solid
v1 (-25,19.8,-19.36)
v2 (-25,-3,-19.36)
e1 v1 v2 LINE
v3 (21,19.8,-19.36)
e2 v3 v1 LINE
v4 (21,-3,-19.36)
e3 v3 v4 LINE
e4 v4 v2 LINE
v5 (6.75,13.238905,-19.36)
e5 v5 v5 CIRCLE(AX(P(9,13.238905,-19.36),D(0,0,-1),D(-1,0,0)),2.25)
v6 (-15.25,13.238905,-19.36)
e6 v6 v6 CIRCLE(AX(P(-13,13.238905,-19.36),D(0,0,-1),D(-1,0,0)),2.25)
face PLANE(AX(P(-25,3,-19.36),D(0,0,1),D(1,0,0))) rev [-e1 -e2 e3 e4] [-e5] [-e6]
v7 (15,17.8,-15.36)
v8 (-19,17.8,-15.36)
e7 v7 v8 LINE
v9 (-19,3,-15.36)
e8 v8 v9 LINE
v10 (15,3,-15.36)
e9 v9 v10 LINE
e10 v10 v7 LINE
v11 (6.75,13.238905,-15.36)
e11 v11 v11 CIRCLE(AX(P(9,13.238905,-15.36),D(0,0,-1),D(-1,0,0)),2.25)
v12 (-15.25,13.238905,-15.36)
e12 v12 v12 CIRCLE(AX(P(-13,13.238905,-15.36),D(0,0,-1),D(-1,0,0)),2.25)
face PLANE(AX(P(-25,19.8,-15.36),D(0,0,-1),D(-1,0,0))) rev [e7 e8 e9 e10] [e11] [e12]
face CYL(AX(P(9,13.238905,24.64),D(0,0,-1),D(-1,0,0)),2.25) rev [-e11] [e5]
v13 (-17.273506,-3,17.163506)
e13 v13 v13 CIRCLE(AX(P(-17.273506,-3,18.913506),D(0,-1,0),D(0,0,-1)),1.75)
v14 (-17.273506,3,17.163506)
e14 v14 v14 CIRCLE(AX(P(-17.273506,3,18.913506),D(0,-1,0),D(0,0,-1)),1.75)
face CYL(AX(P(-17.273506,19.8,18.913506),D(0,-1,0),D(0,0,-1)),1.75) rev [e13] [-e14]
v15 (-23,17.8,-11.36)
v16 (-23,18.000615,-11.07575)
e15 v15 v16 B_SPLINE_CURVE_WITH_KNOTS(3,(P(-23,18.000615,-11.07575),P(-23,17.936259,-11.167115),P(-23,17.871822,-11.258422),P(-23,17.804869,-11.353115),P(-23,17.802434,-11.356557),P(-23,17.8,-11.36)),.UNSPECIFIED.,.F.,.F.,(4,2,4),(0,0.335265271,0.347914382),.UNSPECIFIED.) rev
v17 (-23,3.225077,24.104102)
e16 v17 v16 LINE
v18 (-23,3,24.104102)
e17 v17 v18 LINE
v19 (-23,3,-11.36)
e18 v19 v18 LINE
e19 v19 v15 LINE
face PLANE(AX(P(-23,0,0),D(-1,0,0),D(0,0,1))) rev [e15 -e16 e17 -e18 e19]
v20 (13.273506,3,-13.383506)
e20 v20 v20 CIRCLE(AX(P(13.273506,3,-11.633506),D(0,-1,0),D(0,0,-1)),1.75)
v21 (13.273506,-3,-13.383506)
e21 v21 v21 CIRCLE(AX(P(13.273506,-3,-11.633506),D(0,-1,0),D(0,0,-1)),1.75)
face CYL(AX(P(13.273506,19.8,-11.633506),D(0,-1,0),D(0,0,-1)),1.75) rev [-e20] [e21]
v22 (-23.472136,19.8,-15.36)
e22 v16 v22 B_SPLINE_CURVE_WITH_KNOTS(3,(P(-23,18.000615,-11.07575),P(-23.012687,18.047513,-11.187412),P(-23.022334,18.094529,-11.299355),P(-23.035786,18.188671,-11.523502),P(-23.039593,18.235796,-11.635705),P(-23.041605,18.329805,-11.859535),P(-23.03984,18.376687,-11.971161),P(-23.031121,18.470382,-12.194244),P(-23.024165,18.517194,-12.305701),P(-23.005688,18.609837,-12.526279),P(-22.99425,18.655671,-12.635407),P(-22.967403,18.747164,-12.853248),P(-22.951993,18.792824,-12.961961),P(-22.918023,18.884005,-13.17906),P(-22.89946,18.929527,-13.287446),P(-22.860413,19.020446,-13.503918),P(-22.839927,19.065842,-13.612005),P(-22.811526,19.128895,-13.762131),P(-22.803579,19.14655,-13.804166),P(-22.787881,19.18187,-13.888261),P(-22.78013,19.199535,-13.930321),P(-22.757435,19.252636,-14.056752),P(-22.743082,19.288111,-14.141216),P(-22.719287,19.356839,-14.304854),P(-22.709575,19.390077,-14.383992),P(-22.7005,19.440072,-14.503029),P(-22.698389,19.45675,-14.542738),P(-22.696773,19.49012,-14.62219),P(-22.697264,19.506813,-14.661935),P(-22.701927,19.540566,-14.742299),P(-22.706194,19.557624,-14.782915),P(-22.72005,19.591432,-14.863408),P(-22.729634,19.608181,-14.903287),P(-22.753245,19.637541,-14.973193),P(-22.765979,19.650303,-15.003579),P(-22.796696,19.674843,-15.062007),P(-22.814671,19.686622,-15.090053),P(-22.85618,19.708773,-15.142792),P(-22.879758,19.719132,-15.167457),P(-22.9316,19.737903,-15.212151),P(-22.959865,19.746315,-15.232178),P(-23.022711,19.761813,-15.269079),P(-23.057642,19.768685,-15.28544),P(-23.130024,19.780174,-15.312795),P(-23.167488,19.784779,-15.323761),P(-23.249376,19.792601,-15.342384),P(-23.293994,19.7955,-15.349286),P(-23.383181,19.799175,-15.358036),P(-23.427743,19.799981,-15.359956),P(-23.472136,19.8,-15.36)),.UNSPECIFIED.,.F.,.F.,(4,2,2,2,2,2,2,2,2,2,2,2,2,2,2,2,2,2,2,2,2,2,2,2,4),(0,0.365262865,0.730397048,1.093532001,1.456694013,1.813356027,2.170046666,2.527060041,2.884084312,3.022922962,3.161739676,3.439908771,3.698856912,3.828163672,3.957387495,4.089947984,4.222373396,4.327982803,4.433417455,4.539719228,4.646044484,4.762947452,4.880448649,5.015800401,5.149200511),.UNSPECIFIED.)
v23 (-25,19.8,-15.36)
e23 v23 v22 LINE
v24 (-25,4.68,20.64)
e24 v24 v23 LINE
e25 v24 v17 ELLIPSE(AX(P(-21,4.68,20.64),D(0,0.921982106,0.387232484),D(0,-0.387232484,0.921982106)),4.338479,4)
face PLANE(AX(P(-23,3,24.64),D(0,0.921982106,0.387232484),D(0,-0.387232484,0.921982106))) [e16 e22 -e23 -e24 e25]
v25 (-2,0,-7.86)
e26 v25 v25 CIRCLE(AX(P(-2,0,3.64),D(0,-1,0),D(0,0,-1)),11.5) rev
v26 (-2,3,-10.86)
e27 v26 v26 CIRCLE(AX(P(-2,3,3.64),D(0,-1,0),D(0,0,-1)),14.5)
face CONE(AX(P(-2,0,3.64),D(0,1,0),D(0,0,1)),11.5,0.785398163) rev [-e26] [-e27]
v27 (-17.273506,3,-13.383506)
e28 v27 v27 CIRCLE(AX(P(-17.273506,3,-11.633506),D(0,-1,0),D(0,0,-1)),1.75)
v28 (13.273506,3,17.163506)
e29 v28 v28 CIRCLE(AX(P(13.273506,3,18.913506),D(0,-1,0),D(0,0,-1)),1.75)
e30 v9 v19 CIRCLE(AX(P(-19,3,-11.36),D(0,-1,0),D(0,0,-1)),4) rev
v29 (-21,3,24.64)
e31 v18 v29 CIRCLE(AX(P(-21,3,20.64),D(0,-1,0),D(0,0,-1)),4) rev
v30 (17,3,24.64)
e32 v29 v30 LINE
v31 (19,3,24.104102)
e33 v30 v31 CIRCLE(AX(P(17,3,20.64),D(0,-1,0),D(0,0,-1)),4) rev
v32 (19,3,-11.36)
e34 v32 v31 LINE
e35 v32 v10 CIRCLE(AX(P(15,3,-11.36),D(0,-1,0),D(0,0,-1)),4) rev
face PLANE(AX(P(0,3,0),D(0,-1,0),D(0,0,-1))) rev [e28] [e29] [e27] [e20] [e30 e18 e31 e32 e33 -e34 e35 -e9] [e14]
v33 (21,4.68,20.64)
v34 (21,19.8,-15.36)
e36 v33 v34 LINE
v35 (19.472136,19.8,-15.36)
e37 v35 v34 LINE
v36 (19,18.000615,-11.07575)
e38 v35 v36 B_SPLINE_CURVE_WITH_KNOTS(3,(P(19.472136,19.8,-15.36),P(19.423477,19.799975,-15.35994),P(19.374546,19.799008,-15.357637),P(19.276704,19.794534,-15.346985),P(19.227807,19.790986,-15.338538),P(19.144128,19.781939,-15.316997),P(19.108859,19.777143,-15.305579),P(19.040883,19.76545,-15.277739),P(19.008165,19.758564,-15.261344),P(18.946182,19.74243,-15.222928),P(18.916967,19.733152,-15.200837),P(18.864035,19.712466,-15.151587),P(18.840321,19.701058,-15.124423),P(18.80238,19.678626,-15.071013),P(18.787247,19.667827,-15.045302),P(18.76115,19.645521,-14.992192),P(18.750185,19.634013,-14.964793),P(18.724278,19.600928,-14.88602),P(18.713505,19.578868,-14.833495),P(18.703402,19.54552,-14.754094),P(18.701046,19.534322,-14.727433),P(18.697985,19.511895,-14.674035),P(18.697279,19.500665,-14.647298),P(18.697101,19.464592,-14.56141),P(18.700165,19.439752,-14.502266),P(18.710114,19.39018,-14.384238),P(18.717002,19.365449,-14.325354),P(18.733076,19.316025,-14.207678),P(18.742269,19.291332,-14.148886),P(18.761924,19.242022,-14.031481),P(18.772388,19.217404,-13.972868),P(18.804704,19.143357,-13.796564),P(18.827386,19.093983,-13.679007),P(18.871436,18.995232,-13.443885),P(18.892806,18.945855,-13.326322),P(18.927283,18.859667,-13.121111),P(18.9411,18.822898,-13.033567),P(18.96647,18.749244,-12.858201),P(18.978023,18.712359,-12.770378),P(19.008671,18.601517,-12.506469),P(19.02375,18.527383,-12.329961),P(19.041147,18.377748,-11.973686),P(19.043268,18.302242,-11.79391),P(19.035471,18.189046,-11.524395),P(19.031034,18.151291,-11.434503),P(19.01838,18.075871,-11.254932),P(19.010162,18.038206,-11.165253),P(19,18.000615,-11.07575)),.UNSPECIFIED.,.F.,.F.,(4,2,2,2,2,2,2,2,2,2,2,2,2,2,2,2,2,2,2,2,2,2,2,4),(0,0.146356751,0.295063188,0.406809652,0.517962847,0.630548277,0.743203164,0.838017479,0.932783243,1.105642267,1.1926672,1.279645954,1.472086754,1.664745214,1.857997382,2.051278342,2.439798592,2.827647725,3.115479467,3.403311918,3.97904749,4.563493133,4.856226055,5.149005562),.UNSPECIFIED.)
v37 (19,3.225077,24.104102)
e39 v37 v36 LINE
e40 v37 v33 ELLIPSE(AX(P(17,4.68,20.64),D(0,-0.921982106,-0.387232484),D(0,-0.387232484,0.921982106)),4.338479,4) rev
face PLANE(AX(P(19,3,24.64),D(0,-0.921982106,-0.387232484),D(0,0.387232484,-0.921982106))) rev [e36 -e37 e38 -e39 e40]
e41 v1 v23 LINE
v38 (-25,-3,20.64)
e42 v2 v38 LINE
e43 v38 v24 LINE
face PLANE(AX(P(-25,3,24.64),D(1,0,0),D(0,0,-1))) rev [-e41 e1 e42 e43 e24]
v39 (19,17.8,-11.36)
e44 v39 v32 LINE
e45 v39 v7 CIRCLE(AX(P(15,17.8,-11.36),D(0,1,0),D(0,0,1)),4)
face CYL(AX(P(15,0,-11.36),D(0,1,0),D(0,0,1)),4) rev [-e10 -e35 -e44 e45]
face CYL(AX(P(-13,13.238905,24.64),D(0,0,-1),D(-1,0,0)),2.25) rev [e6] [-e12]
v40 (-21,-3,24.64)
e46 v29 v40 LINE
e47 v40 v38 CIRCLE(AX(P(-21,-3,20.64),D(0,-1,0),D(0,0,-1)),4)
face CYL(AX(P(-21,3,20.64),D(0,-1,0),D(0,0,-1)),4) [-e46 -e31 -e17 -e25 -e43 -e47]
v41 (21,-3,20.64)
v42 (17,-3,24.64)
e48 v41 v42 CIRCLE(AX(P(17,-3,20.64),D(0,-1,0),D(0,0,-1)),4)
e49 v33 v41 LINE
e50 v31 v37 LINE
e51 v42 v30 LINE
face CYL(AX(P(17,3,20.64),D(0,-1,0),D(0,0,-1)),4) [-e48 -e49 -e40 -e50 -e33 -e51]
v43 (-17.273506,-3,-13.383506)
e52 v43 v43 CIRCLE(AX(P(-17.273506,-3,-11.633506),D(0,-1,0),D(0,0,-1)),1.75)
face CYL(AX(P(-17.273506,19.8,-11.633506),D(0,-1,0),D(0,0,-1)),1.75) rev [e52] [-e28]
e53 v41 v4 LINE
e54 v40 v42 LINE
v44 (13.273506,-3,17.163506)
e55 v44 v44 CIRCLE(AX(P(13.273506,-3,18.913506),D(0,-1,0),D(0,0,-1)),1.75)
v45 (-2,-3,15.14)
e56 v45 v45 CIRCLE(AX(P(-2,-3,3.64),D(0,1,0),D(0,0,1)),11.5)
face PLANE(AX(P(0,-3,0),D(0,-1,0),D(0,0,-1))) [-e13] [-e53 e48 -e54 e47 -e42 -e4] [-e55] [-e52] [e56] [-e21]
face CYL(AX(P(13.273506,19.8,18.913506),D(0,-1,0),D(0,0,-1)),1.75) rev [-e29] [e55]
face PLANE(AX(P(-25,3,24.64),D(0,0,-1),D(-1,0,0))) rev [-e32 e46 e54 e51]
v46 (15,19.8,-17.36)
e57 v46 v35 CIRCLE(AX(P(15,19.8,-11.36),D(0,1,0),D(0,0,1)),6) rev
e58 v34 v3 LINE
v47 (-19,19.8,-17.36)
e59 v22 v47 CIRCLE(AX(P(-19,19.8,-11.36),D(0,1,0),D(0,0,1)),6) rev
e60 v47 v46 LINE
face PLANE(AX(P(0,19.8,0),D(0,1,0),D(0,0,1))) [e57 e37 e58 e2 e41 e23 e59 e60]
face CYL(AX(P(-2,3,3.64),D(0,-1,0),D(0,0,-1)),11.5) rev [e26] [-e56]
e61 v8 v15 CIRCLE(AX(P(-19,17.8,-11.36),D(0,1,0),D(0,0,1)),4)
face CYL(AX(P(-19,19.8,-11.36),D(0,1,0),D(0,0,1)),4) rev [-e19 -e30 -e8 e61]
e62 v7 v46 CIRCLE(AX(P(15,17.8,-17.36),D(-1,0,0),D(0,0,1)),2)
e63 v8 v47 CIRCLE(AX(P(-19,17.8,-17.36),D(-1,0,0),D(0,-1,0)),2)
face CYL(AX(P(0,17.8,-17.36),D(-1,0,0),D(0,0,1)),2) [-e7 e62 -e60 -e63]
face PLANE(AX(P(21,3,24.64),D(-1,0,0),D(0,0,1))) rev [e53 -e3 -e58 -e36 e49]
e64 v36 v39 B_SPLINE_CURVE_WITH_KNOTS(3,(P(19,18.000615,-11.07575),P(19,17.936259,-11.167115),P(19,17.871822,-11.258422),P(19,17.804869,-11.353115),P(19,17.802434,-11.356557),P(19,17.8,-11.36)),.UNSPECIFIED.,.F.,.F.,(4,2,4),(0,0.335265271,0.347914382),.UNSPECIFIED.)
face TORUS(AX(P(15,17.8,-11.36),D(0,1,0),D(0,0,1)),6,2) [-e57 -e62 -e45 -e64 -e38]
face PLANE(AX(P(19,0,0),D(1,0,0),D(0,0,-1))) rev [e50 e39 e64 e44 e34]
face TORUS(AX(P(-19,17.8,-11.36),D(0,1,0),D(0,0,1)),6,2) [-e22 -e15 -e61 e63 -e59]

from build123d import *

# Parameters (mm, degrees)
BOSS_EXTRUDE1_START = -3
SKETCH1_W           = 46
SKETCH1_H           = 44
SKETCH1_R           = 11.5
BOSS_EXTRUDE1_DEPTH = 6
SKETCH3_W           = 46
SKETCH3_H           = 4
BOSS_EXTRUDE2_DEPTH = 16.8
BOSS_EXTRUDE3_DEPTH = 2
BOSS_EXTRUDE4_START = -46
BOSS_EXTRUDE4_DEPTH = 2
SKETCH5_R           = 1.75
CUT_EXTRUDE1_DEPTH  = 42.856535929
SKETCH6_R           = 2.25
CUT_EXTRUDE2_DEPTH  = 55.341880718
FILLET1_R           = 4
FILLET2_START       = -19.0000001
FILLET2_2_DEPTH     = 34.0000001
CHAMFER1_SIZE       = 3


with BuildPart() as part:
    # Sketch1 → Boss-Extrude1 (new body)
    with BuildSketch(Plane(origin=(0, 0, 0), x_dir=(1, 0, 0), z_dir=(0, 1, 0)).offset(BOSS_EXTRUDE1_START)):
        with Locations((-2, -2.64)):
            Rectangle(SKETCH1_W, SKETCH1_H)
        with Locations(Location((-2, -3.64, 0), (0, 0, 270))):
            Circle(SKETCH1_R, mode=Mode.SUBTRACT)
    extrude(amount=BOSS_EXTRUDE1_DEPTH)

    # Sketch3 → Boss-Extrude2 (add)
    with BuildSketch(Plane(origin=(0, 3, 0), x_dir=(1, 0, 0), z_dir=(0, 1, 0))):
        with Locations((-2, 17.36)):
            Rectangle(SKETCH3_W, SKETCH3_H)
    extrude(amount=BOSS_EXTRUDE2_DEPTH)

    # Sketch4 → Boss-Extrude3 (add)
    with BuildSketch(Plane.ZY.offset(25)):
        Polygon((-15.36, 19.8), (-15.36, 3), (24.64, 3), align=None)
    extrude(amount=-BOSS_EXTRUDE3_DEPTH)

    # Sketch4<2> → Boss-Extrude4 (add)
    with BuildSketch(Plane.ZY.offset(25).offset(BOSS_EXTRUDE4_START)):
        Polygon((-15.36, 19.8), (-15.36, 3), (24.64, 3), align=None)
    extrude(amount=BOSS_EXTRUDE4_DEPTH)

    # Sketch5 → Cut-Extrude1 (cut, through all)
    with BuildSketch(Plane.XZ.offset(3)):
        with Locations(Location((-17.273506474, 18.913506474, 0), (0, 0, 270))):
            Circle(SKETCH5_R)
        with Locations(Location((13.273506474, 18.913506474, 0), (0, 0, 270))):
            Circle(SKETCH5_R)
        with Locations(Location((13.273506474, -11.633506474, 0), (0, 0, 270))):
            Circle(SKETCH5_R)
        with Locations(Location((-17.273506474, -11.633506474, 0), (0, 0, 270))):
            Circle(SKETCH5_R)
    extrude(amount=-CUT_EXTRUDE1_DEPTH, mode=Mode.SUBTRACT)

    # Sketch6 → Cut-Extrude2 (cut, through all)
    with BuildSketch(Plane(origin=(0, 0, -19.36), x_dir=(-1, 0, 0), z_dir=(0, 0, -1))):
        with Locations((-9, 13.23890477)):
            Circle(SKETCH6_R)
        with Locations((13, 13.23890477)):
            Circle(SKETCH6_R)
    extrude(amount=-CUT_EXTRUDE2_DEPTH, mode=Mode.SUBTRACT)

    # Fillet1
    # the kernel refuses this fillet: 4 mm, written as the material it adds along each edge
    with BuildSketch(Plane(origin=(-23, 29.8, -15.36), x_dir=(0, 0, 1), z_dir=(0, -1, 0))) as fillet1_piece_1_section:
        with BuildLine():
            CenterArc((FILLET1_R, -FILLET1_R), FILLET1_R, 90, 90)
            Line((0, -FILLET1_R), (0, 0))
            Line((0, 0), (FILLET1_R, 0))
        make_face()
    fillet1_piece_1 = extrude(amount=26.8, mode=Mode.PRIVATE)
    fillet1_piece_1 = split(fillet1_piece_1, bisect_by=Plane(origin=(-23, 21.299489969, -18.930214213), z_dir=(0, -0.9219821056073614, -0.3872324843550918)), keep=Keep.TOP, mode=Mode.PRIVATE)
    add(fillet1_piece_1)
    with BuildSketch(Plane(origin=(19, 29.8, -15.36), x_dir=(0, 0, 1), z_dir=(0, -1, 0))) as fillet1_piece_2_section:
        with BuildLine():
            CenterArc((FILLET1_R, FILLET1_R), FILLET1_R, 180, 90)
            Line((0, FILLET1_R), (0, 0))
            Line((0, 0), (FILLET1_R, 0))
        make_face()
    fillet1_piece_2 = extrude(amount=26.8, mode=Mode.PRIVATE)
    fillet1_piece_2 = split(fillet1_piece_2, bisect_by=Plane(origin=(19, 21.299489969, -18.930214213), z_dir=(0, -0.9219821056073614, -0.3872324843550918)), keep=Keep.TOP, mode=Mode.PRIVATE)
    add(fillet1_piece_2)
    # the kernel refuses this fillet: 4 mm, written as the material it takes off along each edge
    with BuildSketch(Plane(origin=(21, -13, 24.64), x_dir=(-1, 0, 0), z_dir=(0, 1, 0))) as fillet1_2_piece_1:
        with BuildLine():
            CenterArc((FILLET1_R, -FILLET1_R), FILLET1_R, 90, 90)
            Line((0, -FILLET1_R), (0, 0))
            Line((0, 0), (FILLET1_R, 0))
        make_face()
    extrude(amount=26, mode=Mode.SUBTRACT)
    with BuildSketch(Plane(origin=(-25, -13, 24.64), x_dir=(1, 0, 0), z_dir=(0, 1, 0))) as fillet1_2_piece_2:
        with BuildLine():
            CenterArc((FILLET1_R, FILLET1_R), FILLET1_R, 180, 90)
            Line((0, FILLET1_R), (0, 0))
            Line((0, 0), (FILLET1_R, 0))
        make_face()
    extrude(amount=26, mode=Mode.SUBTRACT)

    # Fillet2: read off the stored shape, not the designer's step
    # Fillet2 outline → Fillet2 (revolve, cut)
    with BuildSketch(Plane(origin=(15, 0, -11.36), x_dir=(1, 0, 0), z_dir=(0, 0, 1))):
        with BuildLine():
            ThreePointArc((4, 17.8), (4.585786438, 19.214213562), (6, 19.8))
            Line((6, 19.8), (4, 19.8))
            Line((4, 19.8), (4, 17.8))
        make_face()
    revolve(axis=Axis((15, 0, -11.36), (0, 1, 0)), mode=Mode.SUBTRACT)

    # Fillet2 2 outline → Fillet2 2 (cut)
    with BuildSketch(Plane.YZ.offset(FILLET2_START)):
        with BuildLine():
            Line((19.8, -15.36), (17.8, -15.36))
            ThreePointArc((17.8, -15.36), (19.214213562, -15.945786438), (19.8, -17.36))
            Line((19.8, -17.36), (19.8, -15.36))
        make_face()
    extrude(amount=FILLET2_2_DEPTH, mode=Mode.SUBTRACT)

    # Fillet2 3 outline → Fillet2 3 (revolve, cut)
    with BuildSketch(Plane(origin=(-19, 0, -11.36), x_dir=(1, 0, 0), z_dir=(0, 0, 1))):
        with BuildLine():
            ThreePointArc((4, 17.8), (4.585786438, 19.214213562), (6, 19.8))
            Line((6, 19.8), (4, 19.8))
            Line((4, 19.8), (4, 17.8))
        make_face()
    revolve(axis=Axis((-19, 0, -11.36), (0, 1, 0)), mode=Mode.SUBTRACT)

    # Chamfer1
    chamfer1_edges = [part.edges().sort_by_distance(p)[0] for p in [
        (-2, 3, -7.86),
    ]]
    chamfer(chamfer1_edges, length=CHAMFER1_SIZE)


solid = part.part
